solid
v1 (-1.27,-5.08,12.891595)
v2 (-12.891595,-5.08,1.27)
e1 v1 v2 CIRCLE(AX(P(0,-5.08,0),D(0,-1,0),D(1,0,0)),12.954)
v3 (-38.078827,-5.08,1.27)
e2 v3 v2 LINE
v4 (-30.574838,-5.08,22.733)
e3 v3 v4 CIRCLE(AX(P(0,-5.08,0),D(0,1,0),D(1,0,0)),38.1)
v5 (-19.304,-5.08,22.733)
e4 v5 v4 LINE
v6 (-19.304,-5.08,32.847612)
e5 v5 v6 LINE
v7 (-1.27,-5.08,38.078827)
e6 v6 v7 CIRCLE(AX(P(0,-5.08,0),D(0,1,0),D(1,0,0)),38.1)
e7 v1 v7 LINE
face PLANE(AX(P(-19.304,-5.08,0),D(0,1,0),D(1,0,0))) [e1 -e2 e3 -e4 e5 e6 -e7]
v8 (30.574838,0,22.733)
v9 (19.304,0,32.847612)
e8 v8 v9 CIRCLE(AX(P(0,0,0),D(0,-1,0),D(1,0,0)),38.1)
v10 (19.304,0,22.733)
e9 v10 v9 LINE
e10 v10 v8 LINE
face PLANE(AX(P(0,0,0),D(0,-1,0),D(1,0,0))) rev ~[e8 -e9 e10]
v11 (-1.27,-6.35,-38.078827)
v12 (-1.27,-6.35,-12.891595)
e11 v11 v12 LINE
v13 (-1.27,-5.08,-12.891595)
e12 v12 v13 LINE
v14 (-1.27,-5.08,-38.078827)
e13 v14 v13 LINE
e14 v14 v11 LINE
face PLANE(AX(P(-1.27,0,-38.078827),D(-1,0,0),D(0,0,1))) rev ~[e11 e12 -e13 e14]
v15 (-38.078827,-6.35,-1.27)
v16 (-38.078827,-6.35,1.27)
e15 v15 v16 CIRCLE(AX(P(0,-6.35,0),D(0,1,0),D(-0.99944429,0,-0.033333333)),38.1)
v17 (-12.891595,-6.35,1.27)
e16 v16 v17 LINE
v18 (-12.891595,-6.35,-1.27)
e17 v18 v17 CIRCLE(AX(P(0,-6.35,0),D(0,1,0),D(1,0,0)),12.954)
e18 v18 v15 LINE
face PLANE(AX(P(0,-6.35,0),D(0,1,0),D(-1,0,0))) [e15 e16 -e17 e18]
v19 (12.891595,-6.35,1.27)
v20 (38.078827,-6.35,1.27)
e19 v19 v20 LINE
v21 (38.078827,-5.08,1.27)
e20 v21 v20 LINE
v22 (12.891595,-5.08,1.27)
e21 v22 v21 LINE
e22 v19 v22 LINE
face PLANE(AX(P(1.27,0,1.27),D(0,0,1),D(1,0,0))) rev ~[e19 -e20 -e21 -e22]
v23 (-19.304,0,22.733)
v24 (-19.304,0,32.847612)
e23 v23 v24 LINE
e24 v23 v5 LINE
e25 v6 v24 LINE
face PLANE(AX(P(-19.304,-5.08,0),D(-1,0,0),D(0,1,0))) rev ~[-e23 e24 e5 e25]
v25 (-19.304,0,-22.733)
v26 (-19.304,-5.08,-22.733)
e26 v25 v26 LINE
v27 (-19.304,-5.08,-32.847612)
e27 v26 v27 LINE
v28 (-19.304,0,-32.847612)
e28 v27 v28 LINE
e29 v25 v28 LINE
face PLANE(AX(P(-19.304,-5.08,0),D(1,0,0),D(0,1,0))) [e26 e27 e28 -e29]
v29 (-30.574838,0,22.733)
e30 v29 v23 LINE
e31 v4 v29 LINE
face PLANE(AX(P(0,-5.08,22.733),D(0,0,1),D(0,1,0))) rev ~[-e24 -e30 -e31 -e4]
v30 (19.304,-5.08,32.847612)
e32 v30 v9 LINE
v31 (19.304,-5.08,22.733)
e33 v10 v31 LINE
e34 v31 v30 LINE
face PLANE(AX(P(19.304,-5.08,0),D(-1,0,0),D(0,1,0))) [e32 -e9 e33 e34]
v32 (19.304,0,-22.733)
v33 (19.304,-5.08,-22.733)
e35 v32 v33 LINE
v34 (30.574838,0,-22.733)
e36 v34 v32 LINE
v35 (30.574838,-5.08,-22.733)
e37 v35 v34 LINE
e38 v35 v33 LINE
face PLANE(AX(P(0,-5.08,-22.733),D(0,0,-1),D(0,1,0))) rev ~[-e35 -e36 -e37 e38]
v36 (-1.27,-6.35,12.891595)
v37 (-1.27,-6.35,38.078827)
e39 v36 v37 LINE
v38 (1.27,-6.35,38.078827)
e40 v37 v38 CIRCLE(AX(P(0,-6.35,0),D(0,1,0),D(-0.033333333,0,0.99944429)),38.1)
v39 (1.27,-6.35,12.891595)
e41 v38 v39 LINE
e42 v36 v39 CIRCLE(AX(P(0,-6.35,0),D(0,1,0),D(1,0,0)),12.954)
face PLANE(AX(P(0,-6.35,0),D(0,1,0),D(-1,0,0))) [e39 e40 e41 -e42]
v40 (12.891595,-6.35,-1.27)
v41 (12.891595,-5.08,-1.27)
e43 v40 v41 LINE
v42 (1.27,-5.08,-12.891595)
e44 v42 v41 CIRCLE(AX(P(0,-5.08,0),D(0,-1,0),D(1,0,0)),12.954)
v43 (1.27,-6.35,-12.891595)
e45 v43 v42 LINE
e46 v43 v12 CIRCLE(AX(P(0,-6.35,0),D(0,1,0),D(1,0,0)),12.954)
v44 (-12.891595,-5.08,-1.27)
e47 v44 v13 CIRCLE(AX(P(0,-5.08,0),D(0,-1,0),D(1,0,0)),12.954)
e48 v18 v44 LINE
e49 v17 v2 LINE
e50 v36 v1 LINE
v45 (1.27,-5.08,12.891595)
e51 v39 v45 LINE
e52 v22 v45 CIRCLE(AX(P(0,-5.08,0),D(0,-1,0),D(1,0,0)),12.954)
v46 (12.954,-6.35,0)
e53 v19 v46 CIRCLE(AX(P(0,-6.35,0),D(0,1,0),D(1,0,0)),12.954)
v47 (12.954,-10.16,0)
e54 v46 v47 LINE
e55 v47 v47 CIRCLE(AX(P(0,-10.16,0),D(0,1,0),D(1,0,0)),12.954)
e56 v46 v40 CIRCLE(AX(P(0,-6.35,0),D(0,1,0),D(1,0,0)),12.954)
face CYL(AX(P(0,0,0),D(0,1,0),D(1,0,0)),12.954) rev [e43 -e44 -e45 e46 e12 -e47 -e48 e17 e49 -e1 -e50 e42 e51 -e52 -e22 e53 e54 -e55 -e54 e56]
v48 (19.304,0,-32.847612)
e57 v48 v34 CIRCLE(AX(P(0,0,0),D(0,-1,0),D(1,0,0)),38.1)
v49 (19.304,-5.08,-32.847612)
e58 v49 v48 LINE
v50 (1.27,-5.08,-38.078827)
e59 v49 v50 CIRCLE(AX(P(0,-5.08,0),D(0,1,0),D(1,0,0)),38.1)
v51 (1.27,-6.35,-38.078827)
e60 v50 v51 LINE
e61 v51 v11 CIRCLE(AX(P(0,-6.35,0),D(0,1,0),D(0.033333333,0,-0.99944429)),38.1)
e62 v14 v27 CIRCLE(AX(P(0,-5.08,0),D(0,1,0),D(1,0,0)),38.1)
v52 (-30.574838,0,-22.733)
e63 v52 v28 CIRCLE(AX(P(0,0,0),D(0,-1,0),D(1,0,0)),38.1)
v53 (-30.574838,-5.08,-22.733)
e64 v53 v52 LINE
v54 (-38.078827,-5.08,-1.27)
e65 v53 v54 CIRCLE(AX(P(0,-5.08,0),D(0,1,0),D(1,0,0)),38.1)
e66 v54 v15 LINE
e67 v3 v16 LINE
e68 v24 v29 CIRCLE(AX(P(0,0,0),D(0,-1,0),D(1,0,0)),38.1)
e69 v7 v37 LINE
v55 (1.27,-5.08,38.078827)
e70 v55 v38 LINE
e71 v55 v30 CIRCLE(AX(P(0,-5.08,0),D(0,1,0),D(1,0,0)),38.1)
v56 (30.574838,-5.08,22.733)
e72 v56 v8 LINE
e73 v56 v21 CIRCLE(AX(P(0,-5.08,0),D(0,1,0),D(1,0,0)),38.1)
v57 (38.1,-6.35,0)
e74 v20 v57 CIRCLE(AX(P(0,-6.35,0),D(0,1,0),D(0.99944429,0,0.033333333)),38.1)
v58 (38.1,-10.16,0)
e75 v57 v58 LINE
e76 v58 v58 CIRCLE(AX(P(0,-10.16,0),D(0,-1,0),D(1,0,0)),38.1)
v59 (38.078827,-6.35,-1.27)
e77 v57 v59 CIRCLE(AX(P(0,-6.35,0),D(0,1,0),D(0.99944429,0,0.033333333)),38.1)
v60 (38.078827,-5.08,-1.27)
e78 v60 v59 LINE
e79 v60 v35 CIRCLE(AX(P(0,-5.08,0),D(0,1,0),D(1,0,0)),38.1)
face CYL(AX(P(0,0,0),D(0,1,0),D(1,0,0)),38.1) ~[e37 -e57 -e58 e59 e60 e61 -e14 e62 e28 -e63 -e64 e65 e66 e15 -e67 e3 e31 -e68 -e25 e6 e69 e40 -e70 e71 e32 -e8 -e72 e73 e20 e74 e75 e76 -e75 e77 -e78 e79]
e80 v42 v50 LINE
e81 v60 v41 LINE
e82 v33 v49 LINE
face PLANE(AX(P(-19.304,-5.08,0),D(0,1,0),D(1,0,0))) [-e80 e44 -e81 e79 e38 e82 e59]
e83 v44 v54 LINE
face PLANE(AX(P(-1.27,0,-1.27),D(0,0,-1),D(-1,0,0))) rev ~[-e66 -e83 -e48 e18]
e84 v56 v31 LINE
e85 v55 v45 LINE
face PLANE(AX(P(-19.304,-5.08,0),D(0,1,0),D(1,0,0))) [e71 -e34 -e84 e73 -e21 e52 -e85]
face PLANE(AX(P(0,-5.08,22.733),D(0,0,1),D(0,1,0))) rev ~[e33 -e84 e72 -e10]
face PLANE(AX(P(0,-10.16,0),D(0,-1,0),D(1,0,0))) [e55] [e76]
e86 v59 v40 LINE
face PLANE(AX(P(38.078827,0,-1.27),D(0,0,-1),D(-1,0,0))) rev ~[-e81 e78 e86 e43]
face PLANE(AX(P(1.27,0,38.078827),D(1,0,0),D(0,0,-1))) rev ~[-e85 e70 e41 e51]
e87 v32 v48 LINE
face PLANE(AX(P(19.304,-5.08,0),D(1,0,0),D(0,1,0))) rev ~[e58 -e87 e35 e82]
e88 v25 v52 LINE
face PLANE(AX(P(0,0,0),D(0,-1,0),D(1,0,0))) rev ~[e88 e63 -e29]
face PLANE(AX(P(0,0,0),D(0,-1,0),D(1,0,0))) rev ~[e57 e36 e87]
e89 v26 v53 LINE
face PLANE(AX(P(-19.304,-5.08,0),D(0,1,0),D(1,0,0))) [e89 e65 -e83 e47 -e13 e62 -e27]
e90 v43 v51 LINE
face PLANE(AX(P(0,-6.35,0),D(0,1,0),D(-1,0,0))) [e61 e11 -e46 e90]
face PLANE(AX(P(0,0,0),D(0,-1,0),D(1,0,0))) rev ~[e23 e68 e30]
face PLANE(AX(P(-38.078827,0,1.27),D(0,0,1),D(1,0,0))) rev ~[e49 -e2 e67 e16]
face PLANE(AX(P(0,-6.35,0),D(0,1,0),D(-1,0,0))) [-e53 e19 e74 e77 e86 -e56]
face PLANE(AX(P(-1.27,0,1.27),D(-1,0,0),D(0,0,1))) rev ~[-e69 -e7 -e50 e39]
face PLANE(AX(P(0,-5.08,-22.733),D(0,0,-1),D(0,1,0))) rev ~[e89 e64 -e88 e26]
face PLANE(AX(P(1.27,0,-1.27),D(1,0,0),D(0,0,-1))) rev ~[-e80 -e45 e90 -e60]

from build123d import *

# Parameters (mm, degrees)
F0_R          = 12.7
F1_DEPTH      = 17.78
F2_R          = 38.1
F3_DEPTH      = 10.16
F4_R          = 12.954
F5_DEPTH      = 17.781
F5_DEPTH_BACK = 115
F6_W          = 5.08
F6_H          = 45.466
F7_DEPTH      = 38.101
F7_DEPTH_BACK = 38.101
F8_W          = 38.608
F8_H          = 5.08
F9_DEPTH      = 38.101
F9_DEPTH_BACK = 38.101
F11_DEPTH     = 6.35


# Not quite as in the source:
# - an extrude ends at something that could not be found from the text; its depth is read off the source's solid


with BuildPart() as f1:
    # F0 (on Front) → F1 (new body)
    with BuildSketch(Plane.XZ):
        Circle(F0_R)
    extrude(amount=F1_DEPTH)

    # F2 (on Front) → F3 (join)
    with BuildSketch(Plane.XZ):
        Circle(F2_R)
    extrude(amount=F3_DEPTH)

    # F4 (on Front) → F5 (cut, two sides)
    with BuildSketch(Plane.XZ) as f5_sk:
        Circle(F4_R)
    extrude(amount=F5_DEPTH, mode=Mode.SUBTRACT)
    extrude(f5_sk.sketch, amount=-F5_DEPTH_BACK, mode=Mode.SUBTRACT)

    # F6 (on Right) → F7 (cut, two sides)
    with BuildSketch(Plane.YZ) as f7_sk:
        with Locations((-2.54, 0)):
            Rectangle(F6_W, F6_H)
    extrude(amount=F7_DEPTH, mode=Mode.SUBTRACT)
    extrude(f7_sk.sketch, amount=-F7_DEPTH_BACK, mode=Mode.SUBTRACT)

    # F8 (on Top) → F9 (cut, two sides)
    with BuildSketch(Plane.XY) as f9_sk:
        with Locations((0, -2.54)):
            Rectangle(F8_W, F8_H)
    extrude(amount=-F9_DEPTH, mode=Mode.SUBTRACT)
    extrude(f9_sk.sketch, amount=F9_DEPTH_BACK, mode=Mode.SUBTRACT)

    # F10 (on face) → F11 (cut)
    with BuildSketch(Plane(origin=(0, 0, 0), x_dir=(-1, 0, 0), z_dir=(0, 1, 0))):
        with BuildLine():
            Line((1.27, -1.27), (38.0788274504, -1.27))
            ThreePointArc((38.0788274504, -1.27), (38.1, 0), (38.0788274504, 1.27))
            Line((38.0788274504, 1.27), (1.27, 1.27))
            Line((1.27, 1.27), (1.27, 38.0788274504))
            ThreePointArc((1.27, 38.0788274504), (0, 38.1), (-1.27, 38.0788274504))
            Line((-1.27, 38.0788274504), (-1.27, 1.27))
            Line((-1.27, 1.27), (-38.0788274504, 1.27))
            ThreePointArc((-38.0788274504, 1.27), (-38.1, 0), (-38.0788274504, -1.27))
            Line((-38.0788274504, -1.27), (-1.27, -1.27))
            Line((-1.27, -1.27), (-1.27, -38.0788274504))
            ThreePointArc((-1.27, -38.0788274504), (0, -38.1), (1.27, -38.0788274504))
            Line((1.27, -38.0788274504), (1.27, -1.27))
        make_face()
    extrude(amount=-F11_DEPTH, mode=Mode.SUBTRACT)


solid = f1.part
